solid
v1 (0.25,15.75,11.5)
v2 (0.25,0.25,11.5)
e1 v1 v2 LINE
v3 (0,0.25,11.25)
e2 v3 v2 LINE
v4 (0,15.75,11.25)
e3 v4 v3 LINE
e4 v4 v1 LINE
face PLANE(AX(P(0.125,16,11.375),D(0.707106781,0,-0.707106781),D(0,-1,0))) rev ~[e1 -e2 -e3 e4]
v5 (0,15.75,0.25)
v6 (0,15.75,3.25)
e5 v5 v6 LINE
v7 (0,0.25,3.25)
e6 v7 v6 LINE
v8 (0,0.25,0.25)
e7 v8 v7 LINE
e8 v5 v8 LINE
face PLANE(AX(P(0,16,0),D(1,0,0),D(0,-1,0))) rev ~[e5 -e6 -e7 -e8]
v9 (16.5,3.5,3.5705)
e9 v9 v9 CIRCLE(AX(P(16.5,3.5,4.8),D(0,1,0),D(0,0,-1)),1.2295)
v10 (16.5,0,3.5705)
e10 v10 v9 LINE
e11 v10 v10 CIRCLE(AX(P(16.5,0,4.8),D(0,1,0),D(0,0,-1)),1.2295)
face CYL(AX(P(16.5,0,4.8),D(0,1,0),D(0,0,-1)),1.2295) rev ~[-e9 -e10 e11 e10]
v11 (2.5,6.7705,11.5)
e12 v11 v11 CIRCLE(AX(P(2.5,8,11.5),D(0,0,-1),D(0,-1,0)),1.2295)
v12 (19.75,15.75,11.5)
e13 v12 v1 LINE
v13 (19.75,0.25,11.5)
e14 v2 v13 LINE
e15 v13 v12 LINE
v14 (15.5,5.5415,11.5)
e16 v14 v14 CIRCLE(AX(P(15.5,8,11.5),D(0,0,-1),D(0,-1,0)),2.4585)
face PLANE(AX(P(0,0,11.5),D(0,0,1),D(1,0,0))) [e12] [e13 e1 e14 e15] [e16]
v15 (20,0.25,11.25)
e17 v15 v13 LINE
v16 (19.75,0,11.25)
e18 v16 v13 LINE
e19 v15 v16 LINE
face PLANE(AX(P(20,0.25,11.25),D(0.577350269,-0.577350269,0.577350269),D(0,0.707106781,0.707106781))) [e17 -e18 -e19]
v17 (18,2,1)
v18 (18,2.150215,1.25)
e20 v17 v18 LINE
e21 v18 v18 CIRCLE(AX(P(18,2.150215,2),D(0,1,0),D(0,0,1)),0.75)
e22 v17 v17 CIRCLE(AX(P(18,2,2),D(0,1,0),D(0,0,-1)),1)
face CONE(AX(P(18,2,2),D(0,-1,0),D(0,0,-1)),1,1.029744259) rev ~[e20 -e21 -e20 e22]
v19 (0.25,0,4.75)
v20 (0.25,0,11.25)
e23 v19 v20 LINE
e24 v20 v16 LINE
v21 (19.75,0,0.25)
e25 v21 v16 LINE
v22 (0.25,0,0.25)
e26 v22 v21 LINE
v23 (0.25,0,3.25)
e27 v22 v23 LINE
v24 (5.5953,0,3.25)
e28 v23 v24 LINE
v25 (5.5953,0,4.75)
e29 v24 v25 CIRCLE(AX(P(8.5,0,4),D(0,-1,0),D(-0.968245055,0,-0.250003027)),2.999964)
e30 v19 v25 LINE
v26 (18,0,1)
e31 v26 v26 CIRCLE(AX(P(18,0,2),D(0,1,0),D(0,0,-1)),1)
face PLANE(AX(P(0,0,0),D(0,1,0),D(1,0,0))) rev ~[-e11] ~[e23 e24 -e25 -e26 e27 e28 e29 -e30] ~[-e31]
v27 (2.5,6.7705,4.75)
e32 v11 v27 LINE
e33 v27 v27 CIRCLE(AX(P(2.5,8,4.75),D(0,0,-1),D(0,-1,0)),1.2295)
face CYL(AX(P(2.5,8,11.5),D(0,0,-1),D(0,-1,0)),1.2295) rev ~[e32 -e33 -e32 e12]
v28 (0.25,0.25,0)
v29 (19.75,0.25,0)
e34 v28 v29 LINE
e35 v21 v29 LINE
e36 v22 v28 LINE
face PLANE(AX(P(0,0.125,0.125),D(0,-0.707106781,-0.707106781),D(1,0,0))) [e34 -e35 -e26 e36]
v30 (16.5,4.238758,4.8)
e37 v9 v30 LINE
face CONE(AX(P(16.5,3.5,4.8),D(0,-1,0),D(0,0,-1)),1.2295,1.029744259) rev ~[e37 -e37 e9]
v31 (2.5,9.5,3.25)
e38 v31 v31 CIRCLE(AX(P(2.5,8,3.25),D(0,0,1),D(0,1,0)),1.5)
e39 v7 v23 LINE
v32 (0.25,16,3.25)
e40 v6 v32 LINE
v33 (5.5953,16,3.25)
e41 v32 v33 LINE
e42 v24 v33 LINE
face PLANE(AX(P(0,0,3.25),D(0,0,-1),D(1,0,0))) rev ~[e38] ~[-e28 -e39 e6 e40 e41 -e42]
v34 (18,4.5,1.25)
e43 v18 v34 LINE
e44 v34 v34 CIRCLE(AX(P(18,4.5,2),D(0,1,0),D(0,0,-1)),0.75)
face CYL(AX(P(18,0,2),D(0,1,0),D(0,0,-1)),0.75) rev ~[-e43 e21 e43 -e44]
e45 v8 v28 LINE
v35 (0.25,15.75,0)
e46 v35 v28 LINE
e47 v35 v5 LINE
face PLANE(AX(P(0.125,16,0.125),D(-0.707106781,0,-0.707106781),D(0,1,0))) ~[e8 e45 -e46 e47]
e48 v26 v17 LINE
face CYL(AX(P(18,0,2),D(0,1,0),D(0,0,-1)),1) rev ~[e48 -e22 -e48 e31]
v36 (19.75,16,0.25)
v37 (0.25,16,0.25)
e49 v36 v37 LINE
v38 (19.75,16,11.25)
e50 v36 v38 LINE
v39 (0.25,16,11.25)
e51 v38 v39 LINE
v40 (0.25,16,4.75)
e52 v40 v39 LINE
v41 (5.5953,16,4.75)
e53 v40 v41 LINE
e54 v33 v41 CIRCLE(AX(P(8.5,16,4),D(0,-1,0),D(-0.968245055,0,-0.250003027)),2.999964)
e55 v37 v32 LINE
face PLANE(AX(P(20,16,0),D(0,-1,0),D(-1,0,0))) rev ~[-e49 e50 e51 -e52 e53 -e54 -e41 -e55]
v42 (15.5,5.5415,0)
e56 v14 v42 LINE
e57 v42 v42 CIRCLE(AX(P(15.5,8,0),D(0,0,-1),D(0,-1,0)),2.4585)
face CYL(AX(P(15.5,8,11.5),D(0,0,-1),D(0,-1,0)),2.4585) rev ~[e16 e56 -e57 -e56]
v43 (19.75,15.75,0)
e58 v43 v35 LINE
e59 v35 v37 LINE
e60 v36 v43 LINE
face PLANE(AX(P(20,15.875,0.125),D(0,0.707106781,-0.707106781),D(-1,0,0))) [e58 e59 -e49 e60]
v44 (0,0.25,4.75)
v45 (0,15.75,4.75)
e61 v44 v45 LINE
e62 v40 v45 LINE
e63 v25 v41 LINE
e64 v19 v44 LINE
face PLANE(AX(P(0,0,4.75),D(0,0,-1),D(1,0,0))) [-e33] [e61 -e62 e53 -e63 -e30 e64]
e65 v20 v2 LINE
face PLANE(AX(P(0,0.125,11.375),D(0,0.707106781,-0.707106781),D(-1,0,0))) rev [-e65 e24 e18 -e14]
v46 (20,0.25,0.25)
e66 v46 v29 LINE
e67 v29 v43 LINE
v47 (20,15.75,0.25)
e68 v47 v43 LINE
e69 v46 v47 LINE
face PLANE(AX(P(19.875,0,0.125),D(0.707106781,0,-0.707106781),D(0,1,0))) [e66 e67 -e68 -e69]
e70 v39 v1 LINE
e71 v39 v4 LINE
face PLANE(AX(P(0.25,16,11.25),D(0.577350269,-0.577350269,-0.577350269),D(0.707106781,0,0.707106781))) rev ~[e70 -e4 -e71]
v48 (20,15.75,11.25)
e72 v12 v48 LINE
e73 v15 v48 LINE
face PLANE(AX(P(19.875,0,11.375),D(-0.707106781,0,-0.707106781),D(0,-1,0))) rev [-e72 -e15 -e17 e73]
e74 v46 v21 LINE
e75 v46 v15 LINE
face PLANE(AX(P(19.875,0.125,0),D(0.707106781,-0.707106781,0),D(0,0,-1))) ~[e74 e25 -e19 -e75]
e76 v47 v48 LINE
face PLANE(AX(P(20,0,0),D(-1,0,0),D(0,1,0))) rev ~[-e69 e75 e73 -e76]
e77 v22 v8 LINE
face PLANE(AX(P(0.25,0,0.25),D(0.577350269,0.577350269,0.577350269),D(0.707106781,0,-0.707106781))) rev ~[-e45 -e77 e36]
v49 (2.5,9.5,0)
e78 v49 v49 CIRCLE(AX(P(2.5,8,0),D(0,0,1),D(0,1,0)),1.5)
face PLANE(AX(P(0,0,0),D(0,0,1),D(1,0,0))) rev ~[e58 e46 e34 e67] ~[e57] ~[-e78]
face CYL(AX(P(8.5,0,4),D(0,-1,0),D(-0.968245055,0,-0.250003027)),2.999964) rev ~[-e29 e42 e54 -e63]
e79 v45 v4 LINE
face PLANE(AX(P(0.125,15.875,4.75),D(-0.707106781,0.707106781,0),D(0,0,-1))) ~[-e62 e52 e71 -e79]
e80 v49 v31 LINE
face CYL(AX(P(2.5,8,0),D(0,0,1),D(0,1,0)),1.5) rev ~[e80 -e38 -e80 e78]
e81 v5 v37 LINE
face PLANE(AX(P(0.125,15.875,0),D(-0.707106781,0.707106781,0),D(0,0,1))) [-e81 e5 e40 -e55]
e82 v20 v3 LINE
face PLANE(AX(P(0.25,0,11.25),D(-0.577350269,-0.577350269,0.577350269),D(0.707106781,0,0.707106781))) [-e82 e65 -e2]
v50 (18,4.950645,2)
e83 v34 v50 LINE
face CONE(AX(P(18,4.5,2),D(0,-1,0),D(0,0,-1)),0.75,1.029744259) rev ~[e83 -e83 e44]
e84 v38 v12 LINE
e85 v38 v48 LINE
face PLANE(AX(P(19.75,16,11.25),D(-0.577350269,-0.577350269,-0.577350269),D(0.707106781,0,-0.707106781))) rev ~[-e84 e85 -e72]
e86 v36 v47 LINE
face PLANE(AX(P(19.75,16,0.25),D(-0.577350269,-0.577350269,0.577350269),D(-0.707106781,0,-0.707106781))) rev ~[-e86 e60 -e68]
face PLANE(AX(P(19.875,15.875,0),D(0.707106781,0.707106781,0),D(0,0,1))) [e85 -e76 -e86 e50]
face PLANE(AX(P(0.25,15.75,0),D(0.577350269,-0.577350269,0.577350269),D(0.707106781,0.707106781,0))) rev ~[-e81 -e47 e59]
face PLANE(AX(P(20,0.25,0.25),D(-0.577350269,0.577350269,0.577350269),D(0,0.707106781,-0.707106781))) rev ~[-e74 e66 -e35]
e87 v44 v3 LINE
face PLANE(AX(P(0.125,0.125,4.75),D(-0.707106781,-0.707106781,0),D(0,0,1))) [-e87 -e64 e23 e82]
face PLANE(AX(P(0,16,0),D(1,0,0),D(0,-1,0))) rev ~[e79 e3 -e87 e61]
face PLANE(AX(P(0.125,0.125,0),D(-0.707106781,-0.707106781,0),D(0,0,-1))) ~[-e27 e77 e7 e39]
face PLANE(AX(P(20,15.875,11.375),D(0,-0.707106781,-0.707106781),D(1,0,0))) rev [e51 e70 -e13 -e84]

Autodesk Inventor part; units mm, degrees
ref_plane "YZ Plane" through (0, 0, 0) normal (1, 0, 0) x (0, 1, 0)
ref_plane "XZ Plane" through (0, 0, 0) normal (0, 1, 0) x (-1, 0, 0)
ref_plane "XY Plane" through (0, 0, 0) normal (0, 0, 1) x (1, 0, 0)
sketch "Sketch1" plane through (0, 0, 0) normal (0, 0, 1) x (1, 0, 0)
  line L0 (0, 0) -> (20, 0)
  line L1 (20, 0) -> (20, 16)
  line L2 (20, 16) -> (0, 16)
  line L3 (0, 16) -> (0, 0)
  dimension "d0" = 20
  dimension "d1" = 16
extrude "Extrusion1" add sketch "Sketch1" along normal blind 11.5
sketch "Sketch2" plane through (0, 0, 11.5) normal (0, 0, 1) x (1, 0, 0)
  line L0 (20, 0) -> (20, 16) projected
  line L1 (0, 0) -> (20, 0) projected
  point P0 (15.5, 8)
  dimension "d4" = 4.5
  dimension "d5" = 8
hole "Hole1" at (15.5, 8, 11.5) direction (0, 0, -1) diameter 4.917 end through all thread size "M6x1" class "6H" standard "ISO Metric profile"
sketch "Sketch3" plane through (0, 0, 0) normal (0, -1, 0) x (1, 0, 0)
  arc A0 (5.5953, 3.25) -> (5.5953, 4.75) centre (8.5, 4) ccw
  line L0 (0, 0) -> (20, 0) projected
  line L1 (20, 0) -> (20, 11.5) projected
  line L2 (0, 0) -> (0, 11.5) projected
  line L3 (0, 4.75) -> (5.5953, 4.75)
  line L4 (0, 3.25) -> (5.5953, 3.25)
  dimension "d13" = 4
  dimension "d14" = 11.5
  dimension "d15" = 3
  dimension "d16" = 0.75
  dimension "d17" = 0.75
extrude "Extrusion2" cut sketch "Sketch3" against normal through all
sketch "Sketch4" plane through (0, 0, 0) normal (0, -1, 0) x (1, 0, 0)
  line L0 (0, 0) -> (20, 0) projected
  line L1 (20, 0) -> (20, 11.5) projected
  point P0 (16.5, 4.8)
  point P1 (18, 2)
  dimension "d20" = 4.8
  dimension "d21" = 3.5
  dimension "d22" = 2
  dimension "d23" = 2
hole "Hole2" at (16.5, 0, 4.8) direction (0, 1, 0) diameter 2.459 depth 3.5 tip angle 118 thread size "M3x0.5" class "6H" standard "ISO Metric profile"
hole "Hole3" at (18, 0, 2) direction (0, 1, 0) diameter 1.5 depth 4.5 tip angle 118
hole "Hole4" at (18, 0, 2) direction (0, 1, 0) diameter 2 depth 2 tip angle 118
sketch "Sketch5" plane through (0, 0, 11.5) normal (0, 0, 1) x (1, 0, 0)
  line L0 (0, 0) -> (20, 0) projected
  line L1 (20, 0) -> (20, 16) projected
  point P0 (2.5, 8)
  dimension "d45" = 8
  dimension "d46" = 17.5
hole "Hole5" at (2.5, 8, 11.5) direction (0, 0, -1) diameter 2.459 end up to surface thread size "M3x0.5" class "6H" standard "ISO Metric profile"
sketch "Sketch6" plane through (0, 0, 0) normal (0, 0, -1) x (-1, 0, 0)
  circle A0 centre (-2.5, 8) radius 1.2295 projected
  point P0 (0, 0)
hole "Hole6" at (2.5, 8, 0) direction (0, 0, 1) diameter 3 end up to surface
chamfer "Chamfer1" distance 0.25 angle 45 14 edges at (0, 8, 11.5) (0, 16, 8.125) (0, 16, 1.625) (0, 8, 0) (0, 0, 1.625) (0, 0, 8.125) (10, 0, 11.5) (10, 0, 0) (20, 0, 5.75) (20, 8, 11.5) (10, 16, 11.5) (20, 8, 0) (20, 16, 5.75) (10, 16, 0)
equation "\"d17\" = d16"
properties part number "Heat Block" material "Aluminum 6061"
